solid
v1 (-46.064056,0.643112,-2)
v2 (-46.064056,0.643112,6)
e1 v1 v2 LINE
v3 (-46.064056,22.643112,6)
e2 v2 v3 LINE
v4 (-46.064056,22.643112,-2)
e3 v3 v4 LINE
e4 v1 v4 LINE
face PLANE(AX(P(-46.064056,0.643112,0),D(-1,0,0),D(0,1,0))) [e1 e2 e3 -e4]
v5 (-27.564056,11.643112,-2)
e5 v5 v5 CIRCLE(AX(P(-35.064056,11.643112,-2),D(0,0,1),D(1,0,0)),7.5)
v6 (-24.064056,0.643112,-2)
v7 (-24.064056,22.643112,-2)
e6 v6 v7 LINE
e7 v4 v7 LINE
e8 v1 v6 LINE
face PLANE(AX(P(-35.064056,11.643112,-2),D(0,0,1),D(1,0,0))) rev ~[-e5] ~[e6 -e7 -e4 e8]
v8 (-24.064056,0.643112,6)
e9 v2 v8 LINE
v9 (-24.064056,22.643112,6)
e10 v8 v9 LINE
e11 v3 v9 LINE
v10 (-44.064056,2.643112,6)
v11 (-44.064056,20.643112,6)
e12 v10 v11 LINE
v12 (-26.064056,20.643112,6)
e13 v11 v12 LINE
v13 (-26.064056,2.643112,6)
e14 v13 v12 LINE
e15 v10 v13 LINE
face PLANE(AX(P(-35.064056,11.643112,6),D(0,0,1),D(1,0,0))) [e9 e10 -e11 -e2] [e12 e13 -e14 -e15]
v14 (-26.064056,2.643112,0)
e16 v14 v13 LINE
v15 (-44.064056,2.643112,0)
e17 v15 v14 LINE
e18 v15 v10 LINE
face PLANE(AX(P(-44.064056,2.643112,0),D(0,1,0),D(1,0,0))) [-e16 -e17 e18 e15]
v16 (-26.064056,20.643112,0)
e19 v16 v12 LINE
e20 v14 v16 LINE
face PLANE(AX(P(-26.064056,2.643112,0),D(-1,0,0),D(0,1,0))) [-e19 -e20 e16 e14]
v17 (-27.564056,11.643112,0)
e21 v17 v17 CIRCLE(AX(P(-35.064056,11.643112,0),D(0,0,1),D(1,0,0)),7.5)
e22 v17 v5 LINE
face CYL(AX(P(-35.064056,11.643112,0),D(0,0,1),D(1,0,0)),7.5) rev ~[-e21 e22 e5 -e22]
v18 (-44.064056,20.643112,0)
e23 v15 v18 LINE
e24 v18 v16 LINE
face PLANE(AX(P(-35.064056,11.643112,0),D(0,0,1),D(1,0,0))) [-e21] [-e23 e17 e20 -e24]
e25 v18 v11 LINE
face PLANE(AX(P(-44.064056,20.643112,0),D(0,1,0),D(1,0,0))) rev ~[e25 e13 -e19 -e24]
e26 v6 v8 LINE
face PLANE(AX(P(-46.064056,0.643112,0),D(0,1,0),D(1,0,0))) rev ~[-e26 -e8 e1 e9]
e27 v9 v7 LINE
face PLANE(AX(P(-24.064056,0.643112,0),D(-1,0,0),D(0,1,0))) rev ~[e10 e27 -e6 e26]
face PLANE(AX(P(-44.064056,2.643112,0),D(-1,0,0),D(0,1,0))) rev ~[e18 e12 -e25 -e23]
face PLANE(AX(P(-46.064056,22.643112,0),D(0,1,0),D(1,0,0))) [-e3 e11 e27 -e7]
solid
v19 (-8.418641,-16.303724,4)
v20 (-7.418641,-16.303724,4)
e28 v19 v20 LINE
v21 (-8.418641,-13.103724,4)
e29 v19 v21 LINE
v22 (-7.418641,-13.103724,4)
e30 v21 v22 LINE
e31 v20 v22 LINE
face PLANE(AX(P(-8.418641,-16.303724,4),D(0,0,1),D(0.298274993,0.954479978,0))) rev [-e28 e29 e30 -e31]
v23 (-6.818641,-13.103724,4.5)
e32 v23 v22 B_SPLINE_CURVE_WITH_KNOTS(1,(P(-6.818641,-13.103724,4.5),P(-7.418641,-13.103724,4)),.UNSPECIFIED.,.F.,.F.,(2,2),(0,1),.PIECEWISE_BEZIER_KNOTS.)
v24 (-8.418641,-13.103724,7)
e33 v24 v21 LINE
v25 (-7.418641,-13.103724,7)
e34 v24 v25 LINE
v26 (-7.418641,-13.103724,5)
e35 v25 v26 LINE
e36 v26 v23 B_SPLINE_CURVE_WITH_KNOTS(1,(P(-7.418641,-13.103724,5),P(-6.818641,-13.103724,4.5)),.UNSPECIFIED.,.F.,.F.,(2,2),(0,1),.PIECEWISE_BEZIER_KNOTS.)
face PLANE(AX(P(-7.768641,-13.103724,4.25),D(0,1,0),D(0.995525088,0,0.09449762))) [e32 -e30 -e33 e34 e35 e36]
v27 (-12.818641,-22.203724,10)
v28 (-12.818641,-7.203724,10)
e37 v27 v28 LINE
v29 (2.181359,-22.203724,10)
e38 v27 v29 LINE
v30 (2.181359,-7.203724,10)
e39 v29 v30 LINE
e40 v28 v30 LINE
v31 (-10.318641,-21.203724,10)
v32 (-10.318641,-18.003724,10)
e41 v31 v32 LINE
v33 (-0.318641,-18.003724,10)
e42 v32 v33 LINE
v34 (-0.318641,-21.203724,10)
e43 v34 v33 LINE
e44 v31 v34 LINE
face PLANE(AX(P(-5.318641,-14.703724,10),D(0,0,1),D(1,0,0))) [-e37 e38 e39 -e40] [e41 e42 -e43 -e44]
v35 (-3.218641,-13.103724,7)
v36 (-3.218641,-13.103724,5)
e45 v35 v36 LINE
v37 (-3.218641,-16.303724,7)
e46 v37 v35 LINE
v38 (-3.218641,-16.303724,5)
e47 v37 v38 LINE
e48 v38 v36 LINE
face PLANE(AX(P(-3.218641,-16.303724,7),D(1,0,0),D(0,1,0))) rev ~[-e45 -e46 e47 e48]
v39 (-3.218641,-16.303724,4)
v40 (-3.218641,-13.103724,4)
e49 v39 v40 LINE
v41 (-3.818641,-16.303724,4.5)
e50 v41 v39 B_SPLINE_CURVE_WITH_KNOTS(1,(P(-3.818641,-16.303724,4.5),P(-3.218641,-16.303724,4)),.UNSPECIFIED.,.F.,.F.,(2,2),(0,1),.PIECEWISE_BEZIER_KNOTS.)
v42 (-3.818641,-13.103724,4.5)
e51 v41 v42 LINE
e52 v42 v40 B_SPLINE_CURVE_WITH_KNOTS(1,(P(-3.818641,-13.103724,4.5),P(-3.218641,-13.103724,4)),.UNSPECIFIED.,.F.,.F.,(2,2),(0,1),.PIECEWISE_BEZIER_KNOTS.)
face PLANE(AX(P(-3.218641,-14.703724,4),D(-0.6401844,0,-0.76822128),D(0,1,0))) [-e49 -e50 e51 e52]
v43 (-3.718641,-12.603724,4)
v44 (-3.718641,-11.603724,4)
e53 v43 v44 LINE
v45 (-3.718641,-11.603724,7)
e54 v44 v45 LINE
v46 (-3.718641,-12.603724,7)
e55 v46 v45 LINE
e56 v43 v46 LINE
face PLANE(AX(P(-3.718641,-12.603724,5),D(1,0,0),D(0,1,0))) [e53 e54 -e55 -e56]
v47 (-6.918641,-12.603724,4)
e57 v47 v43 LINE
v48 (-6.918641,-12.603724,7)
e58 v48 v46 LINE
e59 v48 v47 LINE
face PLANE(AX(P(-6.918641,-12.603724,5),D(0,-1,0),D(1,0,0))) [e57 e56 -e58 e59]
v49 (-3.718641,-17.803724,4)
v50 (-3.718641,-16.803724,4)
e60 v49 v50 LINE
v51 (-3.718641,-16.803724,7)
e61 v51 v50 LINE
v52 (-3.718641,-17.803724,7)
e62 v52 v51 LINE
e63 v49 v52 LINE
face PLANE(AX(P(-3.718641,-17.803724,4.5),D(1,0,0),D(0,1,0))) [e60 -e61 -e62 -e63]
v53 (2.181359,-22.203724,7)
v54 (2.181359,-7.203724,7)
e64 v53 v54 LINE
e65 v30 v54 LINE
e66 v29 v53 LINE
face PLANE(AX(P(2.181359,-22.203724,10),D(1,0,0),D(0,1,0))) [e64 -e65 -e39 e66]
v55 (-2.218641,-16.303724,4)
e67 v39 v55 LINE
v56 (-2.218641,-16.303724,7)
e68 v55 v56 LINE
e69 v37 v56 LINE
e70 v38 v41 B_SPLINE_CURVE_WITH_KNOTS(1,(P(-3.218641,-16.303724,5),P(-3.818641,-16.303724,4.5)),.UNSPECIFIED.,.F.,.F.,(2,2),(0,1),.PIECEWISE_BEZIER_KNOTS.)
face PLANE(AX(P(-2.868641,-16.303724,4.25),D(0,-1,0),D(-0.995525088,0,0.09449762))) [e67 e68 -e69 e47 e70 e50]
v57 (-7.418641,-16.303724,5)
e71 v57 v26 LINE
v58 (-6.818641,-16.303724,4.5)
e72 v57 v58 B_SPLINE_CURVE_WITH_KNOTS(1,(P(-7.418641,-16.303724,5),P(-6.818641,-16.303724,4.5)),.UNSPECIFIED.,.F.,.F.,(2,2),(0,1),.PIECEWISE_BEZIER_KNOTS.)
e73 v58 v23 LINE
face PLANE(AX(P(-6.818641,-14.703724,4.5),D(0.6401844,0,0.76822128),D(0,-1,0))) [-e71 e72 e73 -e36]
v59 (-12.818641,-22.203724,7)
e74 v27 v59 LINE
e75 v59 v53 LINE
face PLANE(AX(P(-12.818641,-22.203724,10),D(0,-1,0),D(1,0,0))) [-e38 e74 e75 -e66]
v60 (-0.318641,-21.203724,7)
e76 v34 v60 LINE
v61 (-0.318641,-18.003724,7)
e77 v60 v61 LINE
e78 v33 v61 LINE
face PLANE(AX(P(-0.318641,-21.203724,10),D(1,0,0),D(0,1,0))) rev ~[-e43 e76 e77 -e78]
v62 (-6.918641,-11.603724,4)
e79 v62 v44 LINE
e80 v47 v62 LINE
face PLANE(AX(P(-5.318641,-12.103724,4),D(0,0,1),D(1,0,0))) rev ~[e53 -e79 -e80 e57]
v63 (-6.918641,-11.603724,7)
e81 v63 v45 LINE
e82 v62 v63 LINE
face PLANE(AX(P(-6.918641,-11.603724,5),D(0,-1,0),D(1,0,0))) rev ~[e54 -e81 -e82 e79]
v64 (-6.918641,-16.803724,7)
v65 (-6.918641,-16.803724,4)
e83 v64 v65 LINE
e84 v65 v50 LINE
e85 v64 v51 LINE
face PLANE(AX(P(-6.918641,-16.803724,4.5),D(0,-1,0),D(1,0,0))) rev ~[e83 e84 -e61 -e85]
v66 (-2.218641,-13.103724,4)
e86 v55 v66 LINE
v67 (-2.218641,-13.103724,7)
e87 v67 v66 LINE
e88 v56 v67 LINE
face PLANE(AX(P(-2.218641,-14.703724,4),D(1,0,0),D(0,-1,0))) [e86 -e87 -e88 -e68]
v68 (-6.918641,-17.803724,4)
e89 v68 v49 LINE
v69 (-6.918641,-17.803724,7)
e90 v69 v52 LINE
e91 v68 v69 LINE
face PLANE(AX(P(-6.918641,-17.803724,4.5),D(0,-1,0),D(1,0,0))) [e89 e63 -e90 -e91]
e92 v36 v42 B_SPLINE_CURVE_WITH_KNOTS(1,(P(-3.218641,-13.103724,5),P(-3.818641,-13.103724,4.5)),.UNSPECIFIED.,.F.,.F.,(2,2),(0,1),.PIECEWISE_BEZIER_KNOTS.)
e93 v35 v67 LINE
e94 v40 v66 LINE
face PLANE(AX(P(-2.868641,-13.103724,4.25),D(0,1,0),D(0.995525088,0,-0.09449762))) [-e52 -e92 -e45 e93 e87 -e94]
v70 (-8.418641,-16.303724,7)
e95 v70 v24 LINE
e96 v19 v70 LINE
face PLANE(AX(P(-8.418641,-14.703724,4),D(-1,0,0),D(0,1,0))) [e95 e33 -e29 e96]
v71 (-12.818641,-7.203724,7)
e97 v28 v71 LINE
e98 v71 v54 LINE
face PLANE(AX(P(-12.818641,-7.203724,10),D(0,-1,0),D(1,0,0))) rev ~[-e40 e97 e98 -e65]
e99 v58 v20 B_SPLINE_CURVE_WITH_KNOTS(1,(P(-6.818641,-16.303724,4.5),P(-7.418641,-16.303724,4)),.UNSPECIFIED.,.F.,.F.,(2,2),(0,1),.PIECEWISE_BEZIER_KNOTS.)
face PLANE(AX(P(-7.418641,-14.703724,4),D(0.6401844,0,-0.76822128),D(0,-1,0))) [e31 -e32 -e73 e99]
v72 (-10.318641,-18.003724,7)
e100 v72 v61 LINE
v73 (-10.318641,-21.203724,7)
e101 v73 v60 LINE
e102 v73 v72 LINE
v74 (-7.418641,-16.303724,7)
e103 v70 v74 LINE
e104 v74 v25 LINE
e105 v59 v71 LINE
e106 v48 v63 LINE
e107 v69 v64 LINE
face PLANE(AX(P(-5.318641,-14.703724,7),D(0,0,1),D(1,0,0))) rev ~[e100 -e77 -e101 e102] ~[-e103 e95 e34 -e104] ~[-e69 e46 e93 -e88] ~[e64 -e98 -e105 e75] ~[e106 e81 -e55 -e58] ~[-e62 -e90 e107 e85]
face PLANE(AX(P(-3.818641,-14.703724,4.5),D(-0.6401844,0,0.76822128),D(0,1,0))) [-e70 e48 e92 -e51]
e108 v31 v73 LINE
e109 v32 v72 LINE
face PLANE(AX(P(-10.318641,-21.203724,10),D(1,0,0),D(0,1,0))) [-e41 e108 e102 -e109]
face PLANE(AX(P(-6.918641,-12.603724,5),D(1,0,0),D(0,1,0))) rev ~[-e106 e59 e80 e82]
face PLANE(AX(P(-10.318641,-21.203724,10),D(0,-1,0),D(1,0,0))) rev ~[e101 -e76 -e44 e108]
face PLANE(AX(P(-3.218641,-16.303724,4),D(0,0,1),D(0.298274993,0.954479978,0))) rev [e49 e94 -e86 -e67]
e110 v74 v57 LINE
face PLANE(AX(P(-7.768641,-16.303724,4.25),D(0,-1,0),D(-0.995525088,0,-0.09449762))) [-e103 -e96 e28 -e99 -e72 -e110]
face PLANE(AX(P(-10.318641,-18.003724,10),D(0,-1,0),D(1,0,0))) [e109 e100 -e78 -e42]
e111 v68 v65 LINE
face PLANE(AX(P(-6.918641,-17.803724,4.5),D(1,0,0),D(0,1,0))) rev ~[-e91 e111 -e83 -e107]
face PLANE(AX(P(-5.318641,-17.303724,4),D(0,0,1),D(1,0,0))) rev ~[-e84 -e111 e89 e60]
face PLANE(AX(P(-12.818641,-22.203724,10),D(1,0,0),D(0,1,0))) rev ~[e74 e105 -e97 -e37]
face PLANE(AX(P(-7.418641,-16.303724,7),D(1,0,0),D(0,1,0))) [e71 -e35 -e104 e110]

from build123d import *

# Parameters (mm, degrees)
F0_W       = 22
F0_H       = 22
F0_W_2     = 18
F0_H_2     = 18
F0_R       = 7.5
F1_DEPTH   = 2
F2_DEPTH   = 6
F5_W       = 15
F5_H       = 15
F5_W_2     = 10
F5_H_2     = 3.2
F13_DEPTH  = 3
F7_W       = 3.2
F7_H       = 1
F7_W_2     = 1
F7_H_2     = 3.2
F14_DEPTH  = 2
F14_FACE_W = 1
F14_FACE_H = 3.2
F10_W      = 1.6
F10_H      = 3.2
F17_DEPTH  = 0.5
F15_FACE_W = 1.6
F15_FACE_H = 3.2
F12_W      = 1
F12_H      = 3.2
F16_FACE_W = 1.6
F16_FACE_H = 3.2
F20_DEPTH  = 0.5


# Not quite as in the source:
# - a feature names something its author has since deleted; it is built from what else it names


with BuildPart() as f1:
    # F0 (on Top) → F1 (new body)
    with BuildSketch(Plane.XY):
        with Locations((-35.0640561283, 11.6431117058)):
            Rectangle(F0_W, F0_H)
        with Locations((-35.0640561283, 11.6431117058)):
            Rectangle(F0_W_2, F0_H_2, mode=Mode.SUBTRACT)
        with Locations((-35.0640561283, 11.6431117058)):
            Rectangle(F0_W_2, F0_H_2)
        with Locations((-35.0640561283, 11.6431117058)):
            Circle(F0_R, mode=Mode.SUBTRACT)
    extrude(amount=-F1_DEPTH)

    # F0 (on Top) → F2 (join)
    with BuildSketch(Plane.XY):
        with Locations((-35.0640561283, 11.6431117058)):
            Rectangle(F0_W, F0_H)
        with Locations((-35.0640561283, 11.6431117058)):
            Rectangle(F0_W_2, F0_H_2, mode=Mode.SUBTRACT)
    extrude(amount=F2_DEPTH)


with BuildPart() as f13:
    # F5 (on offset) → F13 (new body, through all)
    with BuildSketch(Plane.XY.offset(10)):
        with Locations((-5.3186413549, -14.7037236601)):
            Rectangle(F5_W, F5_H)
        with Locations((-5.3186413549, -19.6037236601)):
            Rectangle(F5_W_2, F5_H_2, mode=Mode.SUBTRACT)
    extrude(amount=-F13_DEPTH)

    # F7 (on offset) → F14 (join, through all)
    with BuildSketch(Plane.XY.offset(7)):
        with Locations((-5.3186413549, -12.1037236601)):
            Rectangle(F7_W, F7_H)
        with Locations((-2.7186413549, -14.7037236601)):
            Rectangle(F7_W_2, F7_H_2)
        with Locations((-5.3186413549, -17.3037236601)):
            Rectangle(F7_W, F7_H)
        with Locations((-7.9186413549, -14.7037236601)):
            Rectangle(F7_W_2, F7_H_2)
    extrude(amount=-F14_DEPTH)

    # F14_face (on face) → F15 section 0
    with BuildSketch(Plane(origin=(-2.7186413549, -14.7037236601, 5), x_dir=(1, 0, 0), z_dir=(0, 0, -1))):
        Rectangle(F14_FACE_W, F14_FACE_H)
    # F10 (on offset) → F15 section 1
    with BuildSketch(Plane.XY.offset(4.5)):
        with Locations((-3.0186413549, -14.7037236601)):
            Rectangle(F10_W, F10_H)
    loft()

    # F14_face (on face) → F16 section 0
    with BuildSketch(Plane(origin=(-2.7186413549, -14.7037236601, 5), x_dir=(1, 0, 0), z_dir=(0, 0, -1))):
        with Locations((-5.2, 0)):
            Rectangle(F14_FACE_W, F14_FACE_H)
    # F10 (on offset) → F16 section 1
    with BuildSketch(Plane.XY.offset(4.5)):
        with Locations((-7.6186413549, -14.7037236601)):
            Rectangle(F10_W, F10_H)
    loft()

    # F17 (add, through all): faces of the model
    f17_faces = [f13.faces().sort_by_distance(p)[0] for p in [
        (-5.3186413549, -12.1037236601, 5),
        (-5.3186413549, -17.3037236601, 5),
    ]]
    extrude(f17_faces, amount=F17_DEPTH)

    # F15_face (on face) → F18 section 0
    with BuildSketch(Plane(origin=(-3.0186413549, -14.7037236601, 4.5), x_dir=(1, 0, 0), z_dir=(0, 0, -1))):
        Rectangle(F15_FACE_W, F15_FACE_H)
    # F12 (on offset) → F18 section 1
    with BuildSketch(Plane.XY.offset(4)):
        with Locations((-2.7186413549, -14.7037236601)):
            Rectangle(F12_W, F12_H)
    loft()

    # F16_face (on face) → F19 section 0
    with BuildSketch(Plane(origin=(-7.6186413549, -14.7037236601, 4.5), x_dir=(1, 0, 0), z_dir=(0, 0, -1))):
        Rectangle(F16_FACE_W, F16_FACE_H)
    # F12 (on offset) → F19 section 1
    with BuildSketch(Plane.XY.offset(4)):
        with Locations((-7.9186413549, -14.7037236601)):
            Rectangle(F12_W, F12_H)
    loft()

    # F20 (add, through all): faces of the model
    f20_faces = [f13.faces().sort_by_distance(p)[0] for p in [
        (-5.3186413549, -17.3037236601, 4.5),
        (-5.3186413549, -12.1037236601, 4.5),
    ]]
    extrude(f20_faces, amount=F20_DEPTH)


solid = Compound([f1.part, f13.part])
